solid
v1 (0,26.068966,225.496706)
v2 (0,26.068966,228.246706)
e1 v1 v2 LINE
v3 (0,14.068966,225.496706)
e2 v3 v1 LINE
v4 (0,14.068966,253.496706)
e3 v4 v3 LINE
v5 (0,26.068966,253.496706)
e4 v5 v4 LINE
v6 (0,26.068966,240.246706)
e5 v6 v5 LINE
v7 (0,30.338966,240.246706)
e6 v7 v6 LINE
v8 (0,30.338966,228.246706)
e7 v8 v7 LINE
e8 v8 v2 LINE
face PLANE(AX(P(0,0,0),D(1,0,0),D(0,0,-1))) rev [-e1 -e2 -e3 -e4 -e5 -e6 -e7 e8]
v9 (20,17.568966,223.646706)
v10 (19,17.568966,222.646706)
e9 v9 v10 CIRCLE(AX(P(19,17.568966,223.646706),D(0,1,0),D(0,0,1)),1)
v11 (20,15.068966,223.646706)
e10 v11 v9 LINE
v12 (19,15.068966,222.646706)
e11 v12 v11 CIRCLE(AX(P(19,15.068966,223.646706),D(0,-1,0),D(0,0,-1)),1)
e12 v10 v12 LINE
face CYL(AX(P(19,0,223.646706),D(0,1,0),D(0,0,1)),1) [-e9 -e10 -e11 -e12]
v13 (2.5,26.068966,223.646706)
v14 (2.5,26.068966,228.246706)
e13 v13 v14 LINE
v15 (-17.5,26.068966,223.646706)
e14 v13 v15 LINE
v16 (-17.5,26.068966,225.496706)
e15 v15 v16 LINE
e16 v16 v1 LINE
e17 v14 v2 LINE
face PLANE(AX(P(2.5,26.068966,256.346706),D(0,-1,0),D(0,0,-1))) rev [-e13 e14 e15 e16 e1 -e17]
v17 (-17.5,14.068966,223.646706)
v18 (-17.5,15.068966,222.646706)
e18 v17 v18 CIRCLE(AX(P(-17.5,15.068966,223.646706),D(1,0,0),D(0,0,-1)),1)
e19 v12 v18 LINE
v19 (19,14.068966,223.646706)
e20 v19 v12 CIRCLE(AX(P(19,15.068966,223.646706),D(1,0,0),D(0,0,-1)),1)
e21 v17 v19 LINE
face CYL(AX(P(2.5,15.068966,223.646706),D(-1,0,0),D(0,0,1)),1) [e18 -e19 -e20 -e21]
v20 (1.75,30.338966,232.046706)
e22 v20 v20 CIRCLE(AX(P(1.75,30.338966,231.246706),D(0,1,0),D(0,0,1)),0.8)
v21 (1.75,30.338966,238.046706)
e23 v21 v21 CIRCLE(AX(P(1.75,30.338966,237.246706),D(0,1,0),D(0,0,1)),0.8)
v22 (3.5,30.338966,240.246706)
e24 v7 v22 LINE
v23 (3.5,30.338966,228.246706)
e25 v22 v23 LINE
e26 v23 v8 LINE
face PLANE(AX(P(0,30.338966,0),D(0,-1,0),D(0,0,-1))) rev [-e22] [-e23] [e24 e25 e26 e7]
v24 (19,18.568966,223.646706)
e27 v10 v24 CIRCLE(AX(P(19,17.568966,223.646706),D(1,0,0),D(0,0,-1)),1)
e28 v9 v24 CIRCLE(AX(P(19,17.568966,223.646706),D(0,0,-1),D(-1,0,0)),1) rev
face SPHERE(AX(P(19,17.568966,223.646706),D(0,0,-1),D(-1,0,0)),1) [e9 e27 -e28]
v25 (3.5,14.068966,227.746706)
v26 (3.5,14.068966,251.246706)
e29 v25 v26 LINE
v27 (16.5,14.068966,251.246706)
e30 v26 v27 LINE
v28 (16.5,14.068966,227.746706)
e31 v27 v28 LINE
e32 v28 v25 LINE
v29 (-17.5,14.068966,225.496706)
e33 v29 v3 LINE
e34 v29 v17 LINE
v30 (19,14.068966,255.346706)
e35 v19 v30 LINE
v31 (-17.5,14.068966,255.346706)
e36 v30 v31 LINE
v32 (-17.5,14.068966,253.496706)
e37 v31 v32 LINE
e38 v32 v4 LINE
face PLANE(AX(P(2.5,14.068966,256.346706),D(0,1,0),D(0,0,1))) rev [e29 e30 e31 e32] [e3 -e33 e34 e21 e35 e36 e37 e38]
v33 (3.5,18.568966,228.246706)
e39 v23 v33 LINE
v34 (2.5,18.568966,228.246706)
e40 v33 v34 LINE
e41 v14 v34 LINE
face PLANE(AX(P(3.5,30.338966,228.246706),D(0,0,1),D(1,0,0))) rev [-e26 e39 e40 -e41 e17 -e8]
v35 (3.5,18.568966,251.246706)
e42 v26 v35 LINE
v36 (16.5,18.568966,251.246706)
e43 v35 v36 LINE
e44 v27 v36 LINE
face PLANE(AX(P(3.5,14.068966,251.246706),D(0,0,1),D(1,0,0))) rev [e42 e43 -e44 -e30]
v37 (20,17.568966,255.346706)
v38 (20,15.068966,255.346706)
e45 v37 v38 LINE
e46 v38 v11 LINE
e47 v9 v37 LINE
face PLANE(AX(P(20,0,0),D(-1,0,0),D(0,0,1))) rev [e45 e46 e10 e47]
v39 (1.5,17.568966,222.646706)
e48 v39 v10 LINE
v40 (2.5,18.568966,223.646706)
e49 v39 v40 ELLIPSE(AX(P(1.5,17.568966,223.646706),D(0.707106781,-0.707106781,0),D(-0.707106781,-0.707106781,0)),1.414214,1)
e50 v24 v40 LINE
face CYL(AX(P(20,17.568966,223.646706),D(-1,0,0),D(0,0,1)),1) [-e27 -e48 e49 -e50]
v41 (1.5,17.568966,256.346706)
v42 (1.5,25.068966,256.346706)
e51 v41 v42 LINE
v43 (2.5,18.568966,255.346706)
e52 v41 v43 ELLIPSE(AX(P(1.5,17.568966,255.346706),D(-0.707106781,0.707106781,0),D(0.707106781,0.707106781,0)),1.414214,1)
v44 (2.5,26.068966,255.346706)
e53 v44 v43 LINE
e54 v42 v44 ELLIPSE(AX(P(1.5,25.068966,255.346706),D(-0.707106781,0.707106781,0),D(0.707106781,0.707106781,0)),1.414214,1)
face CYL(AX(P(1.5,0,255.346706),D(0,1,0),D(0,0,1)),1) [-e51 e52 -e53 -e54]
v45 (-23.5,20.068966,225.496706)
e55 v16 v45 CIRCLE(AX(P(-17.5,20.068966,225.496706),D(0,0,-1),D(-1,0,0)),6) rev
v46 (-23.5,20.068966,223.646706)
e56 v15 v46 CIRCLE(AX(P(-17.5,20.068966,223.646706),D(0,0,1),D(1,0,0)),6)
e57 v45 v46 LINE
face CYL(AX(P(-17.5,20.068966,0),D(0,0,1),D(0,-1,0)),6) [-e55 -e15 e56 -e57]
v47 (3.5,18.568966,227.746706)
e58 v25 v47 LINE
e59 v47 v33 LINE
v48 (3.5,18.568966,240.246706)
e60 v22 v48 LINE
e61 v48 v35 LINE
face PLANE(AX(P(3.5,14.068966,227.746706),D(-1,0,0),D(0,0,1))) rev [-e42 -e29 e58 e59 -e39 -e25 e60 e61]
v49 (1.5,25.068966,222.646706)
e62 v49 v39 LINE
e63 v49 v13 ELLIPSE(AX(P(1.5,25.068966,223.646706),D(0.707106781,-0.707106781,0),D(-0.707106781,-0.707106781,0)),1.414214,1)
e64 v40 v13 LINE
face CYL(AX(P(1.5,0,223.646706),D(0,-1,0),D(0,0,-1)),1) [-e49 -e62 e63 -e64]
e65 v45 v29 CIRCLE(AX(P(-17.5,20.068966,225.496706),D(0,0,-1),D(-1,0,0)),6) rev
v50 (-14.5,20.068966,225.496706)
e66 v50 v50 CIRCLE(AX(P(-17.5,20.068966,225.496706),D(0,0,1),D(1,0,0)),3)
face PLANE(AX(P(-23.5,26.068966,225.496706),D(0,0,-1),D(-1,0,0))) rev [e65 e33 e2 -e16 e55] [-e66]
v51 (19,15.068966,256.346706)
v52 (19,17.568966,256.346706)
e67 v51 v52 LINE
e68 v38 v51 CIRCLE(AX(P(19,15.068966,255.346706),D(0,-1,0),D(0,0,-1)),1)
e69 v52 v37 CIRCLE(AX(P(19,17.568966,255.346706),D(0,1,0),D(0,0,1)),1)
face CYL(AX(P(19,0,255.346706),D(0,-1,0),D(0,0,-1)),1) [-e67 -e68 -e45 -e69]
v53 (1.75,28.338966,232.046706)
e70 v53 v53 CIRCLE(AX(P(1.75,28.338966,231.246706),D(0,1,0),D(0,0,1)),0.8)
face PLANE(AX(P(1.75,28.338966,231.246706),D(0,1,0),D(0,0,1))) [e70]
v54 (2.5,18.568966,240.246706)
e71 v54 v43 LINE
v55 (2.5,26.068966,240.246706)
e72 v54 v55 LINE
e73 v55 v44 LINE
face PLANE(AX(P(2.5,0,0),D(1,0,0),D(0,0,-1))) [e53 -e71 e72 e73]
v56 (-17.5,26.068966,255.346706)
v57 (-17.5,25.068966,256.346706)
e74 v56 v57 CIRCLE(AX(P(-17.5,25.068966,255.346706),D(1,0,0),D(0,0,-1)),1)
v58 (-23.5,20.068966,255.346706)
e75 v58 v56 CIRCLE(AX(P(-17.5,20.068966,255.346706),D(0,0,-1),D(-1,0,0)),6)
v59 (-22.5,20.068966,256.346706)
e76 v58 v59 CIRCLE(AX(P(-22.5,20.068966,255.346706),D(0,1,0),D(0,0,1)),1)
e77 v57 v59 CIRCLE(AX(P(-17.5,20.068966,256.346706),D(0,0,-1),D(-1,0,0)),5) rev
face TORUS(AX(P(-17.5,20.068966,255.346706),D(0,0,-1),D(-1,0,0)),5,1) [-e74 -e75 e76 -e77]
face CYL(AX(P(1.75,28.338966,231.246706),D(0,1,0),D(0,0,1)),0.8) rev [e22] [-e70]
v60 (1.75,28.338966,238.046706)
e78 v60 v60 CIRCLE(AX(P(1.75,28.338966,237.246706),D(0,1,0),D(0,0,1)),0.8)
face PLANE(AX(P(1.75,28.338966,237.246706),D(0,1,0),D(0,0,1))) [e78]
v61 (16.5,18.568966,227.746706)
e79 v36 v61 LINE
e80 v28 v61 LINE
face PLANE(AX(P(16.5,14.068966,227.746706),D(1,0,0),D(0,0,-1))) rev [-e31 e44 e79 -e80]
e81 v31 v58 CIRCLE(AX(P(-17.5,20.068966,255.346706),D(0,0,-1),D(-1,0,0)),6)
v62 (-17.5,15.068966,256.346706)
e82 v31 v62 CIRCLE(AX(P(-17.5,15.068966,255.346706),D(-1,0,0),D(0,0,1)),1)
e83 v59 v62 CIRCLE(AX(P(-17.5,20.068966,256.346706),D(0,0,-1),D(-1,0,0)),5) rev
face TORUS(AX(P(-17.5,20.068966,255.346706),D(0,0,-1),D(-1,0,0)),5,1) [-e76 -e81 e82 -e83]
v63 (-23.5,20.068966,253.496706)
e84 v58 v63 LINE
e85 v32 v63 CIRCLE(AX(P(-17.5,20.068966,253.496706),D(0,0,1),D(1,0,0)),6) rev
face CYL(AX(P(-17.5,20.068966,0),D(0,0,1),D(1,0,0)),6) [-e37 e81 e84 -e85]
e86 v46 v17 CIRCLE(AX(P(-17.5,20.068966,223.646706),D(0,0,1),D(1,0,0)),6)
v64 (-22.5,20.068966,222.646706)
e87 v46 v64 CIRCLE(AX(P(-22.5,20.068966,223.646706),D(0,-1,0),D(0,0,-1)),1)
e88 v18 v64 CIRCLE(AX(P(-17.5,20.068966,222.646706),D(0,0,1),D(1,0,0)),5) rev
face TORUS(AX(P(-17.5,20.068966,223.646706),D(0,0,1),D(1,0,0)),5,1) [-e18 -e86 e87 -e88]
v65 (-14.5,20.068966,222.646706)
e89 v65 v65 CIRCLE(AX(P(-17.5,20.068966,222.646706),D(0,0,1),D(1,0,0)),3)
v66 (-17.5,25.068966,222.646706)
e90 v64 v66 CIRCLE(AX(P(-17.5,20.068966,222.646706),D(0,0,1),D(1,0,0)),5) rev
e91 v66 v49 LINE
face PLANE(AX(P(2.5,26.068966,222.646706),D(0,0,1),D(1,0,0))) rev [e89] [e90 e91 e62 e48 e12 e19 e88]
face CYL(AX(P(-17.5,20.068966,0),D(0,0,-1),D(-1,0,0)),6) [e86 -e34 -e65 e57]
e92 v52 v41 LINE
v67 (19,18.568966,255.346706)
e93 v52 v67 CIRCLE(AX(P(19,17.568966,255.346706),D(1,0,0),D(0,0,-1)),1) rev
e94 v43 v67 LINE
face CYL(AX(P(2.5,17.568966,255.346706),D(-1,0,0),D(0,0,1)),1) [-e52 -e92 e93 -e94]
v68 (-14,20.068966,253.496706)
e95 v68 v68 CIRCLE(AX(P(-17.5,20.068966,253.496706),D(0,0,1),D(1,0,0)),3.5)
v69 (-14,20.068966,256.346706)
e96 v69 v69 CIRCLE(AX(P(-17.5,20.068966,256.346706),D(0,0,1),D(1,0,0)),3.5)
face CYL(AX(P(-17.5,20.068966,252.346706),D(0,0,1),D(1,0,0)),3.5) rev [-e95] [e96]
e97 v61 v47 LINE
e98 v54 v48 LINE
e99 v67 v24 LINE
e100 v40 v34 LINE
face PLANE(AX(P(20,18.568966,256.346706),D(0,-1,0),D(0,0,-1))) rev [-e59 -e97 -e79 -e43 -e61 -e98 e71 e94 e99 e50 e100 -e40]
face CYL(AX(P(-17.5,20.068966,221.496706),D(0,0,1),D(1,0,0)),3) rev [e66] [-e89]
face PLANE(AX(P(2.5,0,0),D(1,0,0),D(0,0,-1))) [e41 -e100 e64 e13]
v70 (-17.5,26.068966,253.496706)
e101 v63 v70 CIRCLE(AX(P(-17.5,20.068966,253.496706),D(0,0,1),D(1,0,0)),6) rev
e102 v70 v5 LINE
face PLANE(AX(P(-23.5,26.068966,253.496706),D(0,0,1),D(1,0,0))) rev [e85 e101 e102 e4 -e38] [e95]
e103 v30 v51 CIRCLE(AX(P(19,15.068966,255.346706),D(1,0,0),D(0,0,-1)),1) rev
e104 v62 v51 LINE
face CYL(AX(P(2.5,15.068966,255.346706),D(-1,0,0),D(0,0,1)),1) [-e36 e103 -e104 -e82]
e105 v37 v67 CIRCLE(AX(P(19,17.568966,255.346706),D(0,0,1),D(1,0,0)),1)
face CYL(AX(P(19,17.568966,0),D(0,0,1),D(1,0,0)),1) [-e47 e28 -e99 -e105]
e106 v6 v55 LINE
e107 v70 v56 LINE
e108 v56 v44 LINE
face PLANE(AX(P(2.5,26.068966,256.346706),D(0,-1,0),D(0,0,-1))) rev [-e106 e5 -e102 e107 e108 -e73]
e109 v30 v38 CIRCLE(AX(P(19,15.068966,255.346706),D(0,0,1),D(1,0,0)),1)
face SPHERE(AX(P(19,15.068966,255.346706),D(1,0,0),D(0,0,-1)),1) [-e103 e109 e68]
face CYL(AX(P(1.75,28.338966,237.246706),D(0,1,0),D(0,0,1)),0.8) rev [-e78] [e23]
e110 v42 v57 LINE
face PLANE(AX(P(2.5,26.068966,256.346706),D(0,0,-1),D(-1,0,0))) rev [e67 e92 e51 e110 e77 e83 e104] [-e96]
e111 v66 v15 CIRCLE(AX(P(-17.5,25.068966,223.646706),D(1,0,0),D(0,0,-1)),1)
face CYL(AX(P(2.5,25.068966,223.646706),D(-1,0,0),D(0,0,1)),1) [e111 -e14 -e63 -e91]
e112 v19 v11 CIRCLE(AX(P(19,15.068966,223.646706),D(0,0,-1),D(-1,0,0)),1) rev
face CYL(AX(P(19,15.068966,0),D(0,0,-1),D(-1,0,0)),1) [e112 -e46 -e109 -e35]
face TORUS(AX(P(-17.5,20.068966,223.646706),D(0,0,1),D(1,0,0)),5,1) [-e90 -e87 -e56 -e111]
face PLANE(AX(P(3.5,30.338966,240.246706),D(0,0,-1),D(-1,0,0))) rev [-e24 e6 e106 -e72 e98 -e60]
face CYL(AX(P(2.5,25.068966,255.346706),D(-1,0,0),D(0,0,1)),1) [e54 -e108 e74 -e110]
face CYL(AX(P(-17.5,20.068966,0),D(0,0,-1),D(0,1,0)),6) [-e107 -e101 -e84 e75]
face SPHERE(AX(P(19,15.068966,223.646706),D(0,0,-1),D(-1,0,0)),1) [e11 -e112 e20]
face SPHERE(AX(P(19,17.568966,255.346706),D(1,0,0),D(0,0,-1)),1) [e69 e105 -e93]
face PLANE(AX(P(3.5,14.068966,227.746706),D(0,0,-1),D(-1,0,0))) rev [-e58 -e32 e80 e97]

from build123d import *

# Parameters (mm, degrees)
SKETCH1_W           = 33.7
SKETCH1_H           = 12
BOSS_EXTRUDE1_DEPTH = 2.5
SKETCH2_W           = 33.7
SKETCH2_H           = 4.5
BOSS_EXTRUDE2_DEPTH = 17.5
SKETCH3_W           = 13
SKETCH3_H           = 23.5
CUT_EXTRUDE1_DEPTH  = 258.235074474
SKETCH4_W           = 2.85
SKETCH4_H           = 12
BOSS_EXTRUDE3_DEPTH = 23.5
FILLET1_R           = 6
SKETCH5_R           = 3.5
CUT_EXTRUDE2_DEPTH  = 4
SKETCH6_R           = 3
CUT_EXTRUDE3_DEPTH  = 4
SKETCH7_W           = 3.5
SKETCH7_H           = 12
BOSS_EXTRUDE4_DEPTH = 11.77
FILLET2_R           = 1
SKETCH8_R           = 0.8
CUT_EXTRUDE4_DEPTH  = 2


with BuildPart() as part:
    # Sketch1 → Boss-Extrude1 (new body)
    with BuildSketch(Plane(origin=(0, 0, 0), x_dir=(0, 0, -1), z_dir=(1, 0, 0))):
        with Locations((-239.496705732, 20.068965517)):
            Rectangle(SKETCH1_W, SKETCH1_H)
    extrude(amount=BOSS_EXTRUDE1_DEPTH)

    # Sketch2 → Boss-Extrude2 (add)
    with BuildSketch(Plane(origin=(2.5, 0, 0), x_dir=(0, 0, -1), z_dir=(1, 0, 0))):
        with Locations((-239.496705732, 16.318965517)):
            Rectangle(SKETCH2_W, SKETCH2_H)
    extrude(amount=BOSS_EXTRUDE2_DEPTH)

    # Sketch3 → Cut-Extrude1 (cut, through all)
    with BuildSketch(Plane(origin=(0, 18.568965517, 0), x_dir=(1, 0, 0), z_dir=(0, 1, 0))):
        with Locations((10, -239.496705732)):
            Rectangle(SKETCH3_W, SKETCH3_H)
    extrude(amount=-CUT_EXTRUDE1_DEPTH, mode=Mode.SUBTRACT)

    # Sketch4 → Boss-Extrude3 (add)
    with BuildSketch(Plane.ZY):
        with Locations((224.071705732, 20.068965517)):
            Rectangle(SKETCH4_W, SKETCH4_H)
        with Locations((254.921705732, 20.068965517)):
            Rectangle(SKETCH4_W, SKETCH4_H)
    extrude(amount=BOSS_EXTRUDE3_DEPTH)

    # Fillet1
    fillet1_edges = [part.edges().sort_by_distance(p)[0] for p in [
        (-23.5, 14.068965517, 224.071705732),
        (-23.5, 26.068965517, 224.071705732),
        (-23.5, 14.068965517, 254.921705732),
        (-23.5, 26.068965517, 254.921705732),
    ]]
    fillet(fillet1_edges, radius=FILLET1_R - 0.0001)  # a hair under: the kernel refuses the full size

    # Sketch5 → Cut-Extrude2 (cut)
    with BuildSketch(Plane.XY.offset(256.346705732)):
        with Locations((-17.5, 20.068965517)):
            Circle(SKETCH5_R)
    extrude(amount=-CUT_EXTRUDE2_DEPTH, mode=Mode.SUBTRACT)

    # Sketch6 → Cut-Extrude3 (cut)
    with BuildSketch(Plane.XY.offset(225.496705732)):
        with Locations((-17.5, 20.068965517)):
            Circle(SKETCH6_R)
    extrude(amount=-CUT_EXTRUDE3_DEPTH, mode=Mode.SUBTRACT)

    # Sketch7 → Boss-Extrude4 (add)
    with BuildSketch(Plane(origin=(0, 18.568965517, 0), x_dir=(1, 0, 0), z_dir=(0, 1, 0))):
        with Locations((1.75, -234.246705732)):
            Rectangle(SKETCH7_W, SKETCH7_H)
    extrude(amount=BOSS_EXTRUDE4_DEPTH)

    # Fillet2
    fillet2_edges = [part.edges().sort_by_distance(p)[0] for p in [
        (2.5, 22.318965517, 222.646705732),
        (11.25, 18.568965517, 256.346705732),
        (11.25, 18.568965517, 222.646705732),
        (20, 16.318965517, 256.346705732),
        (20, 14.068965517, 239.496705732),
        (20, 16.318965517, 222.646705732),
        (20, 18.568965517, 239.496705732),
        (2.5, 22.318965517, 256.346705732),
        (-21.742669976, 24.311635494, 222.646705732),
        (-21.742669976, 15.826295541, 222.646705732),
        (-21.742669976, 24.311635494, 256.346705732),
        (-21.742669976, 15.826295541, 256.346705732),
        (-7.50005, 26.068965517, 256.346705732),
        (-7.50005, 26.068965517, 222.646705732),
        (1.24995, 14.068965517, 222.646705732),
        (1.24995, 14.068965517, 256.346705732),
    ]]
    fillet(fillet2_edges, radius=FILLET2_R)

    # Sketch8 → Cut-Extrude4 (cut)
    with BuildSketch(Plane(origin=(0, 30.338965517, 0), x_dir=(1, 0, 0), z_dir=(0, 1, 0))):
        with Locations(Location((1.75, -231.246705732, 0), (0, 0, 270))):
            Circle(SKETCH8_R)
        with Locations(Location((1.75, -237.246705732, 0), (0, 0, 270))):
            Circle(SKETCH8_R)
    extrude(amount=-CUT_EXTRUDE4_DEPTH, mode=Mode.SUBTRACT)


solid = part.part
